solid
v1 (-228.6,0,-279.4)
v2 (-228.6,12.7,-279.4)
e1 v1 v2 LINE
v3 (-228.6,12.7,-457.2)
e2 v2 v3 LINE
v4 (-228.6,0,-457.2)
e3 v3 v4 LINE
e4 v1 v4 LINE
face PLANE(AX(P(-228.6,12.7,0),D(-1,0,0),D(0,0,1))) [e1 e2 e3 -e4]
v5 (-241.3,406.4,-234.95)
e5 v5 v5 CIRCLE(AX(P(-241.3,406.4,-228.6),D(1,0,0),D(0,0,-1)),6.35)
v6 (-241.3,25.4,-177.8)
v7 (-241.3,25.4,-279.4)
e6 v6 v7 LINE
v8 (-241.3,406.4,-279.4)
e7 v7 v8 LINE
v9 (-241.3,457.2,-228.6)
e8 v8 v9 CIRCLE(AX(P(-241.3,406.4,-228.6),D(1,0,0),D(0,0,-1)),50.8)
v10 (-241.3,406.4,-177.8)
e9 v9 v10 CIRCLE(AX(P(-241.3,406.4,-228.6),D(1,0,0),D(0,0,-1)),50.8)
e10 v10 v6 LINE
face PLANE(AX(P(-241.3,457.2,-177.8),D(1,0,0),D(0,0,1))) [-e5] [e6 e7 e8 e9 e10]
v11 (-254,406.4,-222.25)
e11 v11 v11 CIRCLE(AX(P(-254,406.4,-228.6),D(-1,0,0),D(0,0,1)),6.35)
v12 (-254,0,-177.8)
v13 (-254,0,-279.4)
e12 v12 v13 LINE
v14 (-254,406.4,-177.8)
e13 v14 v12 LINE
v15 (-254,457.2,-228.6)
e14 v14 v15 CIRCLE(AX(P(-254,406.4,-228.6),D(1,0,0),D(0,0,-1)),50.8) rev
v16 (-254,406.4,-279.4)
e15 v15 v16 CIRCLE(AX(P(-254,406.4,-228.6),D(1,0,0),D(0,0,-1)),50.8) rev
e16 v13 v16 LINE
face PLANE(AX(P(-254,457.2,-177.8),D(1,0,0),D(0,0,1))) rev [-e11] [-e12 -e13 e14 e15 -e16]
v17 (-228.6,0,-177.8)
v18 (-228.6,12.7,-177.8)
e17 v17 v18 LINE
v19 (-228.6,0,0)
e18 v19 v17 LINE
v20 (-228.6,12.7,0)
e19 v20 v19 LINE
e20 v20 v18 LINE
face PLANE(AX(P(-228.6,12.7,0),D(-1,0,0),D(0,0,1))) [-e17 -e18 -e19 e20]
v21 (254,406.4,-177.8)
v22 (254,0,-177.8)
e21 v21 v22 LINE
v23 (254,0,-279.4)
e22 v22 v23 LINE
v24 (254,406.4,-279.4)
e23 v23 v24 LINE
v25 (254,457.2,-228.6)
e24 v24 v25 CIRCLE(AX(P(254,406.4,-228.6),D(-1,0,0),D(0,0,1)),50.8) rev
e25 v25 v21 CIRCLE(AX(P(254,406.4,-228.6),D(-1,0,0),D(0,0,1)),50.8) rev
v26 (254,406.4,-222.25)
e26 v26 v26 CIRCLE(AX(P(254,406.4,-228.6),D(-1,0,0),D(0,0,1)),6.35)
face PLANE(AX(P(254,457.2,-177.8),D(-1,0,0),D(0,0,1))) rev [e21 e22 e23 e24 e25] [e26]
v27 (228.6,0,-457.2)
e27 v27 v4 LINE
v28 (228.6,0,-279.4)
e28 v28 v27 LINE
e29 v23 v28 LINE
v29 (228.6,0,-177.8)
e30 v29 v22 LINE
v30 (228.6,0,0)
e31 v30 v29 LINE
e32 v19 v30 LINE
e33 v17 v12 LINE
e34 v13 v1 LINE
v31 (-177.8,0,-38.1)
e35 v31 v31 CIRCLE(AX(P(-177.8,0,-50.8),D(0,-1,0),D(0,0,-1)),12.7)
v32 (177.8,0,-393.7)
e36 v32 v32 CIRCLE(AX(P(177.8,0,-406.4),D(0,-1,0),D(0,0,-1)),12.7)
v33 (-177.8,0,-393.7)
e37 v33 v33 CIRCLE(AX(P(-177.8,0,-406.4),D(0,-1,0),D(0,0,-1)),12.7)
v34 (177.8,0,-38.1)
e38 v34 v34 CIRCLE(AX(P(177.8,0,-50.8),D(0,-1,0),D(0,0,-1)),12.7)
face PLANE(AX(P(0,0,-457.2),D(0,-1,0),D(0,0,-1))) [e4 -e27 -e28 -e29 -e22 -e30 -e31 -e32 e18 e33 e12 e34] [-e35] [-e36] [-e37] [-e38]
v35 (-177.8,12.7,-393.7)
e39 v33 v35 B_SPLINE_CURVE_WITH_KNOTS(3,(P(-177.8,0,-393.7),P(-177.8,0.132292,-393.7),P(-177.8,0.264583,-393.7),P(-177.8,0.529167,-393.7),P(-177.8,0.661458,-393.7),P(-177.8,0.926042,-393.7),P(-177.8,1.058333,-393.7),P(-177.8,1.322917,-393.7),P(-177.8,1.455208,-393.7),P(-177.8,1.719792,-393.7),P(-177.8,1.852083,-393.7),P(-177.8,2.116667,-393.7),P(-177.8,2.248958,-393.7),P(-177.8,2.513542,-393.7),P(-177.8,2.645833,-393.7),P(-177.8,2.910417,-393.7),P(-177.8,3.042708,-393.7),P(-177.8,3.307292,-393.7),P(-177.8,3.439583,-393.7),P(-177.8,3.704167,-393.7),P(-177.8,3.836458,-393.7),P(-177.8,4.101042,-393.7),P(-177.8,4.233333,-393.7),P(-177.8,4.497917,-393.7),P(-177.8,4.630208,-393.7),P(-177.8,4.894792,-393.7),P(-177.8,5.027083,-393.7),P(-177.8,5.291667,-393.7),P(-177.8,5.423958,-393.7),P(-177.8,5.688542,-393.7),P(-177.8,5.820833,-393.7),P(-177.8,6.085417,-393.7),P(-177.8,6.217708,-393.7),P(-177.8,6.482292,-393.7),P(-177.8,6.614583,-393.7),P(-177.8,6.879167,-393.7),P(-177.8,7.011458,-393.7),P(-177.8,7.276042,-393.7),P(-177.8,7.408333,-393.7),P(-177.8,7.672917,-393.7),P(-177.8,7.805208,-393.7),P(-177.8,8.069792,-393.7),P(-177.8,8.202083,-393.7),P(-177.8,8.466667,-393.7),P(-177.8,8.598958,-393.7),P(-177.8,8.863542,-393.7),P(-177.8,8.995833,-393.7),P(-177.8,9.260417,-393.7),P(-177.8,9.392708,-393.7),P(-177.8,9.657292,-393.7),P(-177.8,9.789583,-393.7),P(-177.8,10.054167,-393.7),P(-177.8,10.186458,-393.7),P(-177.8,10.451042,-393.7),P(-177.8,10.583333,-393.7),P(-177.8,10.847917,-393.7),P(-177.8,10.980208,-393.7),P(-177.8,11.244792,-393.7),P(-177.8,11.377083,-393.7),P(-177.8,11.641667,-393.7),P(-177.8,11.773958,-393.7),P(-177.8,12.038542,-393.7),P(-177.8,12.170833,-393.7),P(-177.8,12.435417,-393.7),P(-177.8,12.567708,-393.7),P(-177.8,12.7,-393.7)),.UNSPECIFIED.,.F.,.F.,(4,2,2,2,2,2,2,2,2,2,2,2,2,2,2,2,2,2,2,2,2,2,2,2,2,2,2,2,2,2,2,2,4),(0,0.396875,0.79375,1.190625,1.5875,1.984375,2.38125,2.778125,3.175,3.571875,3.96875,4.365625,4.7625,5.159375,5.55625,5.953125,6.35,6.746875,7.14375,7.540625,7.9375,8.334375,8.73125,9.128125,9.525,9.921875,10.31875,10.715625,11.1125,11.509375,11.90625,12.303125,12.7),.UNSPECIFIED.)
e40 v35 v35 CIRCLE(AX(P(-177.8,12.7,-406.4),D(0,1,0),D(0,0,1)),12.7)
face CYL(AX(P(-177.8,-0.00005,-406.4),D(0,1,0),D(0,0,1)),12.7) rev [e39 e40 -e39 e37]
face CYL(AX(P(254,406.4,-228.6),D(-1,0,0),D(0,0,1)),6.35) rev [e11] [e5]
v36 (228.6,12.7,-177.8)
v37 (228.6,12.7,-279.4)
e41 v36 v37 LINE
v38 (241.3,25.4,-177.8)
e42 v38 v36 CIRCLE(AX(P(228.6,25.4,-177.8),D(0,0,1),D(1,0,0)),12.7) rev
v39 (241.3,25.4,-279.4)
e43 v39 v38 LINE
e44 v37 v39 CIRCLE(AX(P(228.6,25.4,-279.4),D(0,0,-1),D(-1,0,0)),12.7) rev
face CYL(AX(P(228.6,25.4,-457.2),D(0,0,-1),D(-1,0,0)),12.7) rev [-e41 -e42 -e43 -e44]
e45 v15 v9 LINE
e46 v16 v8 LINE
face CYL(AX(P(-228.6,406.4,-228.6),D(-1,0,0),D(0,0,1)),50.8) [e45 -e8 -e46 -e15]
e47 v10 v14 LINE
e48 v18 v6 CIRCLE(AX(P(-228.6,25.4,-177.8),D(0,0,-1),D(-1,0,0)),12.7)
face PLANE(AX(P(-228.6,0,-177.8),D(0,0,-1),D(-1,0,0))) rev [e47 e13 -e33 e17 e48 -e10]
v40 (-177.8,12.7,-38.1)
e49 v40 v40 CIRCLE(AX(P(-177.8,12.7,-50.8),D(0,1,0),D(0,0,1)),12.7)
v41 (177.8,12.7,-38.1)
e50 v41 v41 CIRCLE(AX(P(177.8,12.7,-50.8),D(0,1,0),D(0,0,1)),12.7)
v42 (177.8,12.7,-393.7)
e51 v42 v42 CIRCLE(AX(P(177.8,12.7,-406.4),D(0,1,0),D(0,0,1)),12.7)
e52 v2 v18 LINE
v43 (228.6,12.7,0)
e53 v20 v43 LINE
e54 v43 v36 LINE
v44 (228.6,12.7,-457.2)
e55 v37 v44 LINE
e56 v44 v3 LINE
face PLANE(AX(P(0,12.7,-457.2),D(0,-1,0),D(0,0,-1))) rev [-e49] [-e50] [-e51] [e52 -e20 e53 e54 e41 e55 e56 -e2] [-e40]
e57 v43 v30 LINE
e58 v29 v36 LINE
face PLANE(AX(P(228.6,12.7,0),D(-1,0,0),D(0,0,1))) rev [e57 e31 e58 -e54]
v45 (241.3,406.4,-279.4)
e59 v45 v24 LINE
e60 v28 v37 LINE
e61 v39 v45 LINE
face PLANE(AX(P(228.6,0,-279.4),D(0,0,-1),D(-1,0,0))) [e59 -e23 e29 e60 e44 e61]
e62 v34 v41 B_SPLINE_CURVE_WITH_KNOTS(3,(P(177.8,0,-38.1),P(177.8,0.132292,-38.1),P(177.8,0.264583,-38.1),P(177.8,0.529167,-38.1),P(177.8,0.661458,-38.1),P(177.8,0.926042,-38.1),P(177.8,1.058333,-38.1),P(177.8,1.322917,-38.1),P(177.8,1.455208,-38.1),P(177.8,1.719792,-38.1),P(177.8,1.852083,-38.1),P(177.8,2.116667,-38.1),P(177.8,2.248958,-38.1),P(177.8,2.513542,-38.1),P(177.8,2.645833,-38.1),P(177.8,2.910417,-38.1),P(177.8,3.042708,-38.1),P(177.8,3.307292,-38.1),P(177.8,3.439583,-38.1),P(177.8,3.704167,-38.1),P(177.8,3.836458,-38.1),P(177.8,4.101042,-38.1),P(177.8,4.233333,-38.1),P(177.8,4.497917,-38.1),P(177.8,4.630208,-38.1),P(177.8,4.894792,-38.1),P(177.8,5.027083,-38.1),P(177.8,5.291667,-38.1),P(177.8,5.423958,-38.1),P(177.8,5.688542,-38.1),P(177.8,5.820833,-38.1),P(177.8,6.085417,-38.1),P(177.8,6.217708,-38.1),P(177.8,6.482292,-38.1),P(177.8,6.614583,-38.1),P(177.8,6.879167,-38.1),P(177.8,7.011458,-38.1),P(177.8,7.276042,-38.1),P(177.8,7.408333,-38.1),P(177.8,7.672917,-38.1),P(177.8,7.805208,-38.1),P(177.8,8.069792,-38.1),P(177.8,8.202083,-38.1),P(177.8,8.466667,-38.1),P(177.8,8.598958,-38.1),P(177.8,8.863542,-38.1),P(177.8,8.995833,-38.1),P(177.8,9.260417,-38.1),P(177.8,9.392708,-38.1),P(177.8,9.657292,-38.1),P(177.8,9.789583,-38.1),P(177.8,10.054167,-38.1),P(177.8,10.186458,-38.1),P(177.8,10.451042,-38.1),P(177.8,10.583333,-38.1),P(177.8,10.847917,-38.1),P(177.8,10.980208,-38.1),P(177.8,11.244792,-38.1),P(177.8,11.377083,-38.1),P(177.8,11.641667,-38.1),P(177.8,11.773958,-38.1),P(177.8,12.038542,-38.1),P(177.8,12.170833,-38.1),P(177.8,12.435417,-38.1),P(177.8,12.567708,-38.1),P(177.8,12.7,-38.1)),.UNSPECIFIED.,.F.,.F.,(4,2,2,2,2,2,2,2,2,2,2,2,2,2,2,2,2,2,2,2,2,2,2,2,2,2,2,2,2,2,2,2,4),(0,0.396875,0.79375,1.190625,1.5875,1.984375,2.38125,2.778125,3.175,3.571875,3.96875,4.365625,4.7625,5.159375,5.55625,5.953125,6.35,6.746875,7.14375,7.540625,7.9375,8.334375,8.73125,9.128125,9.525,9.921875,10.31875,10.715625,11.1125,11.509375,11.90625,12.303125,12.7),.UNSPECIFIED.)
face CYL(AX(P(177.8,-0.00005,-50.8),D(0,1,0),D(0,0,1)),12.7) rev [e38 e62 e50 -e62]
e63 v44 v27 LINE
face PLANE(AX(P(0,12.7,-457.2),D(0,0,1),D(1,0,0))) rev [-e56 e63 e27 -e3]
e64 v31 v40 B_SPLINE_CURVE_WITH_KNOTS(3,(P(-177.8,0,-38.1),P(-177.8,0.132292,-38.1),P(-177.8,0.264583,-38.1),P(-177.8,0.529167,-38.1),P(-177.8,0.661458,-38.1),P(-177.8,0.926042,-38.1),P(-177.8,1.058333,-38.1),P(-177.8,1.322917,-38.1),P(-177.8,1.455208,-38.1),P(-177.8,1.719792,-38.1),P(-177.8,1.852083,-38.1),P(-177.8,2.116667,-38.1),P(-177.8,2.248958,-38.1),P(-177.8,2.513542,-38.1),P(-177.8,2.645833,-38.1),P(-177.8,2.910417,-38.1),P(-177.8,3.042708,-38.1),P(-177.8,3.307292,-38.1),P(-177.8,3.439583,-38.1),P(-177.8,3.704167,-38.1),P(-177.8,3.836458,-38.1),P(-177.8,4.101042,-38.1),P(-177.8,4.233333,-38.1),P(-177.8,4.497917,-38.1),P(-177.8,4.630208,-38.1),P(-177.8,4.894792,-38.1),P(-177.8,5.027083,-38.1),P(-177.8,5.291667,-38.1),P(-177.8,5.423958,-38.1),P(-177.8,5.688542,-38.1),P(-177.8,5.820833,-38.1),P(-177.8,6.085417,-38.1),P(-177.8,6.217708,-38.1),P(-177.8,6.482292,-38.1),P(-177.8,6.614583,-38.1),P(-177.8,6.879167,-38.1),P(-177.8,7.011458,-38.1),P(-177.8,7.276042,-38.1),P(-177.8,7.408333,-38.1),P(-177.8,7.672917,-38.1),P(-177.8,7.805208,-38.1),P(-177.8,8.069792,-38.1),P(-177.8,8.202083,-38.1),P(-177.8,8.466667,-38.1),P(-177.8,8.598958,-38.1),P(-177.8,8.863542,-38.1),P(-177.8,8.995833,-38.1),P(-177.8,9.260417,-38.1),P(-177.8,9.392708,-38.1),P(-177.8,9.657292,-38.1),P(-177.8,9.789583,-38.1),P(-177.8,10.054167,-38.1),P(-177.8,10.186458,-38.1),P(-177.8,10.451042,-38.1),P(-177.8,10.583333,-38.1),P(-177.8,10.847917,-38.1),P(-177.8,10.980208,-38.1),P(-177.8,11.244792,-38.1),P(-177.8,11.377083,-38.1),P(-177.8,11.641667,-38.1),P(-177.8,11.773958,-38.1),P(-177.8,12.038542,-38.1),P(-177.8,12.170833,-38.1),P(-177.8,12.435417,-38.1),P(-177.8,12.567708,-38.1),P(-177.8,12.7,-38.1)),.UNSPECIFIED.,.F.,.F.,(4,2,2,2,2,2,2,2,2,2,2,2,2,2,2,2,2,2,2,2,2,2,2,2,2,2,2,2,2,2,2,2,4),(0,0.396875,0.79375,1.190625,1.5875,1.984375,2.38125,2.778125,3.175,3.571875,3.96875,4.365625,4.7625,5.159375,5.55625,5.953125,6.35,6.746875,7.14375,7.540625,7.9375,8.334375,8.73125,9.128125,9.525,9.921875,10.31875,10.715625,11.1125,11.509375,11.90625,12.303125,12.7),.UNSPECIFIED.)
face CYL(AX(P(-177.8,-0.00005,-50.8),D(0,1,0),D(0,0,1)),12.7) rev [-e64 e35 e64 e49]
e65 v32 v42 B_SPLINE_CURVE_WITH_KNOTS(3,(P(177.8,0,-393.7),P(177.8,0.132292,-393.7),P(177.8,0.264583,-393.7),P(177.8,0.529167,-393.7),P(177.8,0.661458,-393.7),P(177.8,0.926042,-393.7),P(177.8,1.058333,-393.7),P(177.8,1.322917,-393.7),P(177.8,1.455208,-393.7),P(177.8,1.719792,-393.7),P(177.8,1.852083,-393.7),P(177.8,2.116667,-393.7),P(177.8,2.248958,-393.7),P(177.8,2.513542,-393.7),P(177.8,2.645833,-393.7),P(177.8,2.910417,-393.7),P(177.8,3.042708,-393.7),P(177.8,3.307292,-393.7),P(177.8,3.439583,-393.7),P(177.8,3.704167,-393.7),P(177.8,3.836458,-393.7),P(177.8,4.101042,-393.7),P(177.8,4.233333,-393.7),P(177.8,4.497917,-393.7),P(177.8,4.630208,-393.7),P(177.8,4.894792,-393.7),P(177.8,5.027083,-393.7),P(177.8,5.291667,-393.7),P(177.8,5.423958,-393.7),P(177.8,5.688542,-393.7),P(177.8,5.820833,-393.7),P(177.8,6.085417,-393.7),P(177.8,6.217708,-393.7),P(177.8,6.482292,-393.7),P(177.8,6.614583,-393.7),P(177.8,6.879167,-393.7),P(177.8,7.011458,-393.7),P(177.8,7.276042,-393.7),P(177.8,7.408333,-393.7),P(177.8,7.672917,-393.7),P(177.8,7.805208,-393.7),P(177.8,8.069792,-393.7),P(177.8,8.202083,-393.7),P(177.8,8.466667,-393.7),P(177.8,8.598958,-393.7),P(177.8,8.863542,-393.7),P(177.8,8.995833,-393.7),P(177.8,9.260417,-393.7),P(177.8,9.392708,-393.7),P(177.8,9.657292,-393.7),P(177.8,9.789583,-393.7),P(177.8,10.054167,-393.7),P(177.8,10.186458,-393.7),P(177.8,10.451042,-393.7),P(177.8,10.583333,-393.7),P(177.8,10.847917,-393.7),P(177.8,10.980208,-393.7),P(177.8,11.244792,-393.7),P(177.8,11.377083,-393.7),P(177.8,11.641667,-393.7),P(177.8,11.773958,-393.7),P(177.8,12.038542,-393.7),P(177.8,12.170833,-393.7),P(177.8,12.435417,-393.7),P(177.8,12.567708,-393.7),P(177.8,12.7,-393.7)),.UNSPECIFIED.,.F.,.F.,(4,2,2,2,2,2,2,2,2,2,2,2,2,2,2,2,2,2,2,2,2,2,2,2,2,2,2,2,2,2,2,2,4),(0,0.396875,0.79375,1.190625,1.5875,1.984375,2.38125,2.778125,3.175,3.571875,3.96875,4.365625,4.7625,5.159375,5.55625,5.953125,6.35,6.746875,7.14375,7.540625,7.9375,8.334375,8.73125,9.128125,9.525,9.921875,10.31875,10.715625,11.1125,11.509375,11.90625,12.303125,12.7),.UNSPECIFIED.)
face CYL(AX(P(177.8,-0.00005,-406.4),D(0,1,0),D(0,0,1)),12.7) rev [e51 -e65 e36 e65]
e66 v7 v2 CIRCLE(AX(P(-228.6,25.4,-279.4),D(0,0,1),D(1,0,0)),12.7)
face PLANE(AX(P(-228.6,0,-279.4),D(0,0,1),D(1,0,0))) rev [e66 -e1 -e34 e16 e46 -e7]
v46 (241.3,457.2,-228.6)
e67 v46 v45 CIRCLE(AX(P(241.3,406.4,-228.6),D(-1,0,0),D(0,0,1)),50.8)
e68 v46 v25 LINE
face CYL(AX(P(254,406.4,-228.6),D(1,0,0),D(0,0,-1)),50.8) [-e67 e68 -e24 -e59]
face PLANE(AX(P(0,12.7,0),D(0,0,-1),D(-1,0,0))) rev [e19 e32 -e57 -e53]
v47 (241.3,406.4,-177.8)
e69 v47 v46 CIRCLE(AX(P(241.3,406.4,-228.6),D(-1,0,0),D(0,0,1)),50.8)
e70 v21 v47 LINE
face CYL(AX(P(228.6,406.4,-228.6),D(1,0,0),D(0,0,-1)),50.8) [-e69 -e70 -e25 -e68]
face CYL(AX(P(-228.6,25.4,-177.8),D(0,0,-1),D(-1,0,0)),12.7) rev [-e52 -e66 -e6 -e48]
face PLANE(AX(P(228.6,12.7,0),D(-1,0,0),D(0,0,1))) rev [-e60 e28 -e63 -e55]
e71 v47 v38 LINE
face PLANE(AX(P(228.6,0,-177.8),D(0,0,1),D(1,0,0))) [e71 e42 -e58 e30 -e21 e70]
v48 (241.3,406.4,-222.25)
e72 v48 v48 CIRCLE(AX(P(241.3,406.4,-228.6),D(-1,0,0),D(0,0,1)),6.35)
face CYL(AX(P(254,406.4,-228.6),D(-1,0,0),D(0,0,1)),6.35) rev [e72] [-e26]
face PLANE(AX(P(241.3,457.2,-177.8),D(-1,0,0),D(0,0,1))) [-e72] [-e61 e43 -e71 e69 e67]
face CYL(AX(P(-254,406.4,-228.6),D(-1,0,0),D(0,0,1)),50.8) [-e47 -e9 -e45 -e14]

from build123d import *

# Parameters (mm, degrees)
SKETCH1_W            = 228.6
SKETCH1_H            = 457.2
BOSS_EXTRUDE1_DEPTH  = 12.7
SKETCH2_W            = 12.7
SKETCH2_H            = 101.6
BOSS_EXTRUDE2_DEPTH  = 12.7
SKETCH3_W            = 101.6
SKETCH3_H            = 457.2
BOSS_EXTRUDE3_DEPTH  = 12.7
FILLET1_R            = 12.7
FILLET1_OF_MIRROR1_R = 12.7
SKETCH4_R            = 6.35
CUT_EXTRUDE1_DEPTH   = 823.269834057
FILLET2_R            = 50.8
FILLET3_R            = 50.8
FILLET4_R            = 50.8
FILLET5_R            = 50.8
SKETCH5_R            = 12.7
CUT_EXTRUDE2_DEPTH   = 687.387711137
SKETCH6_R            = 12.7
CUT_EXTRUDE3_DEPTH   = 687.387711137


with BuildPart() as part:
    # Sketch1 → Boss-Extrude1 (new body)
    with BuildSketch(Plane(origin=(0, 0, 0), x_dir=(1, 0, 0), z_dir=(0, 1, 0))):
        with Locations((114.3, 228.6)):
            Rectangle(SKETCH1_W, SKETCH1_H)
    boss_extrude1 = extrude(amount=BOSS_EXTRUDE1_DEPTH)

    # Sketch2 → Boss-Extrude2 (add)
    with BuildSketch(Plane(origin=(0, 12.7, 0), x_dir=(1, 0, 0), z_dir=(0, 1, 0))):
        with Locations((234.95, 228.6)):
            Rectangle(SKETCH2_W, SKETCH2_H)
    boss_extrude2 = extrude(amount=-BOSS_EXTRUDE2_DEPTH)

    # Sketch3 → Boss-Extrude3 (add)
    with BuildSketch(Plane(origin=(241.3, 0, 0), x_dir=(0, 0, -1), z_dir=(1, 0, 0))):
        with Locations((228.6, 228.6)):
            Rectangle(SKETCH3_W, SKETCH3_H)
    boss_extrude3 = extrude(amount=BOSS_EXTRUDE3_DEPTH)

    # Fillet1
    fillet1_edges = [part.edges().sort_by_distance(p)[0] for p in [
        (241.3, 12.7, -228.6),
    ]]
    fillet(fillet1_edges, radius=FILLET1_R)

    # Mirror1: Boss-Extrude1, Boss-Extrude2, Boss-Extrude3 across plane
    add(boss_extrude1.mirror(Plane(origin=(0, 12.7, 0), x_dir=(0, 0, 1), z_dir=(1, 0, 0))))
    add(boss_extrude2.mirror(Plane(origin=(0, 12.7, 0), x_dir=(0, 0, 1), z_dir=(1, 0, 0))))
    add(boss_extrude3.mirror(Plane(origin=(0, 12.7, 0), x_dir=(0, 0, 1), z_dir=(1, 0, 0))))

    # Fillet1 of Mirror1
    fillet1_of_mirror1_edges = [part.edges().sort_by_distance(p)[0] for p in [
        (-241.3, 12.7, -228.6),
    ]]
    fillet(fillet1_of_mirror1_edges, radius=FILLET1_OF_MIRROR1_R)

    # Sketch4 → Cut-Extrude1 (cut, through all)
    with BuildSketch(Plane.ZY.offset(254)):
        with Locations((-228.6, 406.4)):
            Circle(SKETCH4_R)
    extrude(amount=-CUT_EXTRUDE1_DEPTH, mode=Mode.SUBTRACT)

    # Fillet2
    fillet2_edges = [part.edges().sort_by_distance(p)[0] for p in [
        (-247.65, 457.2, -177.8),
    ]]
    fillet(fillet2_edges, radius=FILLET2_R)

    # Fillet3
    fillet3_edges = [part.edges().sort_by_distance(p)[0] for p in [
        (-247.65, 457.2, -279.4),
    ]]
    fillet(fillet3_edges, radius=FILLET3_R - 0.0001)  # a hair under: the kernel refuses the full size

    # Fillet4
    fillet4_edges = [part.edges().sort_by_distance(p)[0] for p in [
        (247.65, 457.2, -177.8),
    ]]
    fillet(fillet4_edges, radius=FILLET4_R)

    # Fillet5
    fillet5_edges = [part.edges().sort_by_distance(p)[0] for p in [
        (247.65, 457.2, -279.4),
    ]]
    fillet(fillet5_edges, radius=FILLET5_R - 0.0001)  # a hair under: the kernel refuses the full size

    # Sketch5 → Cut-Extrude2 (cut, through all)
    with BuildSketch(Plane(origin=(0, 12.7, 0), x_dir=(1, 0, 0), z_dir=(0, 1, 0))):
        with Locations(Location((-177.8, 406.4, 0), (0, 0, 270))):
            Circle(SKETCH5_R)
    extrude(amount=-CUT_EXTRUDE2_DEPTH, mode=Mode.SUBTRACT)

    # Sketch6 → Cut-Extrude3 (cut, through all)
    with BuildSketch(Plane(origin=(0, 12.7, 0), x_dir=(1, 0, 0), z_dir=(0, 1, 0))):
        with Locations(Location((177.8, 406.4, 0), (0, 0, 270))):
            Circle(SKETCH6_R)
        with Locations(Location((-177.8, 50.8, 0), (0, 0, 270))):
            Circle(SKETCH6_R)
        with Locations(Location((177.8, 50.8, 0), (0, 0, 270))):
            Circle(SKETCH6_R)
    extrude(amount=-CUT_EXTRUDE3_DEPTH, mode=Mode.SUBTRACT)


solid = part.part
